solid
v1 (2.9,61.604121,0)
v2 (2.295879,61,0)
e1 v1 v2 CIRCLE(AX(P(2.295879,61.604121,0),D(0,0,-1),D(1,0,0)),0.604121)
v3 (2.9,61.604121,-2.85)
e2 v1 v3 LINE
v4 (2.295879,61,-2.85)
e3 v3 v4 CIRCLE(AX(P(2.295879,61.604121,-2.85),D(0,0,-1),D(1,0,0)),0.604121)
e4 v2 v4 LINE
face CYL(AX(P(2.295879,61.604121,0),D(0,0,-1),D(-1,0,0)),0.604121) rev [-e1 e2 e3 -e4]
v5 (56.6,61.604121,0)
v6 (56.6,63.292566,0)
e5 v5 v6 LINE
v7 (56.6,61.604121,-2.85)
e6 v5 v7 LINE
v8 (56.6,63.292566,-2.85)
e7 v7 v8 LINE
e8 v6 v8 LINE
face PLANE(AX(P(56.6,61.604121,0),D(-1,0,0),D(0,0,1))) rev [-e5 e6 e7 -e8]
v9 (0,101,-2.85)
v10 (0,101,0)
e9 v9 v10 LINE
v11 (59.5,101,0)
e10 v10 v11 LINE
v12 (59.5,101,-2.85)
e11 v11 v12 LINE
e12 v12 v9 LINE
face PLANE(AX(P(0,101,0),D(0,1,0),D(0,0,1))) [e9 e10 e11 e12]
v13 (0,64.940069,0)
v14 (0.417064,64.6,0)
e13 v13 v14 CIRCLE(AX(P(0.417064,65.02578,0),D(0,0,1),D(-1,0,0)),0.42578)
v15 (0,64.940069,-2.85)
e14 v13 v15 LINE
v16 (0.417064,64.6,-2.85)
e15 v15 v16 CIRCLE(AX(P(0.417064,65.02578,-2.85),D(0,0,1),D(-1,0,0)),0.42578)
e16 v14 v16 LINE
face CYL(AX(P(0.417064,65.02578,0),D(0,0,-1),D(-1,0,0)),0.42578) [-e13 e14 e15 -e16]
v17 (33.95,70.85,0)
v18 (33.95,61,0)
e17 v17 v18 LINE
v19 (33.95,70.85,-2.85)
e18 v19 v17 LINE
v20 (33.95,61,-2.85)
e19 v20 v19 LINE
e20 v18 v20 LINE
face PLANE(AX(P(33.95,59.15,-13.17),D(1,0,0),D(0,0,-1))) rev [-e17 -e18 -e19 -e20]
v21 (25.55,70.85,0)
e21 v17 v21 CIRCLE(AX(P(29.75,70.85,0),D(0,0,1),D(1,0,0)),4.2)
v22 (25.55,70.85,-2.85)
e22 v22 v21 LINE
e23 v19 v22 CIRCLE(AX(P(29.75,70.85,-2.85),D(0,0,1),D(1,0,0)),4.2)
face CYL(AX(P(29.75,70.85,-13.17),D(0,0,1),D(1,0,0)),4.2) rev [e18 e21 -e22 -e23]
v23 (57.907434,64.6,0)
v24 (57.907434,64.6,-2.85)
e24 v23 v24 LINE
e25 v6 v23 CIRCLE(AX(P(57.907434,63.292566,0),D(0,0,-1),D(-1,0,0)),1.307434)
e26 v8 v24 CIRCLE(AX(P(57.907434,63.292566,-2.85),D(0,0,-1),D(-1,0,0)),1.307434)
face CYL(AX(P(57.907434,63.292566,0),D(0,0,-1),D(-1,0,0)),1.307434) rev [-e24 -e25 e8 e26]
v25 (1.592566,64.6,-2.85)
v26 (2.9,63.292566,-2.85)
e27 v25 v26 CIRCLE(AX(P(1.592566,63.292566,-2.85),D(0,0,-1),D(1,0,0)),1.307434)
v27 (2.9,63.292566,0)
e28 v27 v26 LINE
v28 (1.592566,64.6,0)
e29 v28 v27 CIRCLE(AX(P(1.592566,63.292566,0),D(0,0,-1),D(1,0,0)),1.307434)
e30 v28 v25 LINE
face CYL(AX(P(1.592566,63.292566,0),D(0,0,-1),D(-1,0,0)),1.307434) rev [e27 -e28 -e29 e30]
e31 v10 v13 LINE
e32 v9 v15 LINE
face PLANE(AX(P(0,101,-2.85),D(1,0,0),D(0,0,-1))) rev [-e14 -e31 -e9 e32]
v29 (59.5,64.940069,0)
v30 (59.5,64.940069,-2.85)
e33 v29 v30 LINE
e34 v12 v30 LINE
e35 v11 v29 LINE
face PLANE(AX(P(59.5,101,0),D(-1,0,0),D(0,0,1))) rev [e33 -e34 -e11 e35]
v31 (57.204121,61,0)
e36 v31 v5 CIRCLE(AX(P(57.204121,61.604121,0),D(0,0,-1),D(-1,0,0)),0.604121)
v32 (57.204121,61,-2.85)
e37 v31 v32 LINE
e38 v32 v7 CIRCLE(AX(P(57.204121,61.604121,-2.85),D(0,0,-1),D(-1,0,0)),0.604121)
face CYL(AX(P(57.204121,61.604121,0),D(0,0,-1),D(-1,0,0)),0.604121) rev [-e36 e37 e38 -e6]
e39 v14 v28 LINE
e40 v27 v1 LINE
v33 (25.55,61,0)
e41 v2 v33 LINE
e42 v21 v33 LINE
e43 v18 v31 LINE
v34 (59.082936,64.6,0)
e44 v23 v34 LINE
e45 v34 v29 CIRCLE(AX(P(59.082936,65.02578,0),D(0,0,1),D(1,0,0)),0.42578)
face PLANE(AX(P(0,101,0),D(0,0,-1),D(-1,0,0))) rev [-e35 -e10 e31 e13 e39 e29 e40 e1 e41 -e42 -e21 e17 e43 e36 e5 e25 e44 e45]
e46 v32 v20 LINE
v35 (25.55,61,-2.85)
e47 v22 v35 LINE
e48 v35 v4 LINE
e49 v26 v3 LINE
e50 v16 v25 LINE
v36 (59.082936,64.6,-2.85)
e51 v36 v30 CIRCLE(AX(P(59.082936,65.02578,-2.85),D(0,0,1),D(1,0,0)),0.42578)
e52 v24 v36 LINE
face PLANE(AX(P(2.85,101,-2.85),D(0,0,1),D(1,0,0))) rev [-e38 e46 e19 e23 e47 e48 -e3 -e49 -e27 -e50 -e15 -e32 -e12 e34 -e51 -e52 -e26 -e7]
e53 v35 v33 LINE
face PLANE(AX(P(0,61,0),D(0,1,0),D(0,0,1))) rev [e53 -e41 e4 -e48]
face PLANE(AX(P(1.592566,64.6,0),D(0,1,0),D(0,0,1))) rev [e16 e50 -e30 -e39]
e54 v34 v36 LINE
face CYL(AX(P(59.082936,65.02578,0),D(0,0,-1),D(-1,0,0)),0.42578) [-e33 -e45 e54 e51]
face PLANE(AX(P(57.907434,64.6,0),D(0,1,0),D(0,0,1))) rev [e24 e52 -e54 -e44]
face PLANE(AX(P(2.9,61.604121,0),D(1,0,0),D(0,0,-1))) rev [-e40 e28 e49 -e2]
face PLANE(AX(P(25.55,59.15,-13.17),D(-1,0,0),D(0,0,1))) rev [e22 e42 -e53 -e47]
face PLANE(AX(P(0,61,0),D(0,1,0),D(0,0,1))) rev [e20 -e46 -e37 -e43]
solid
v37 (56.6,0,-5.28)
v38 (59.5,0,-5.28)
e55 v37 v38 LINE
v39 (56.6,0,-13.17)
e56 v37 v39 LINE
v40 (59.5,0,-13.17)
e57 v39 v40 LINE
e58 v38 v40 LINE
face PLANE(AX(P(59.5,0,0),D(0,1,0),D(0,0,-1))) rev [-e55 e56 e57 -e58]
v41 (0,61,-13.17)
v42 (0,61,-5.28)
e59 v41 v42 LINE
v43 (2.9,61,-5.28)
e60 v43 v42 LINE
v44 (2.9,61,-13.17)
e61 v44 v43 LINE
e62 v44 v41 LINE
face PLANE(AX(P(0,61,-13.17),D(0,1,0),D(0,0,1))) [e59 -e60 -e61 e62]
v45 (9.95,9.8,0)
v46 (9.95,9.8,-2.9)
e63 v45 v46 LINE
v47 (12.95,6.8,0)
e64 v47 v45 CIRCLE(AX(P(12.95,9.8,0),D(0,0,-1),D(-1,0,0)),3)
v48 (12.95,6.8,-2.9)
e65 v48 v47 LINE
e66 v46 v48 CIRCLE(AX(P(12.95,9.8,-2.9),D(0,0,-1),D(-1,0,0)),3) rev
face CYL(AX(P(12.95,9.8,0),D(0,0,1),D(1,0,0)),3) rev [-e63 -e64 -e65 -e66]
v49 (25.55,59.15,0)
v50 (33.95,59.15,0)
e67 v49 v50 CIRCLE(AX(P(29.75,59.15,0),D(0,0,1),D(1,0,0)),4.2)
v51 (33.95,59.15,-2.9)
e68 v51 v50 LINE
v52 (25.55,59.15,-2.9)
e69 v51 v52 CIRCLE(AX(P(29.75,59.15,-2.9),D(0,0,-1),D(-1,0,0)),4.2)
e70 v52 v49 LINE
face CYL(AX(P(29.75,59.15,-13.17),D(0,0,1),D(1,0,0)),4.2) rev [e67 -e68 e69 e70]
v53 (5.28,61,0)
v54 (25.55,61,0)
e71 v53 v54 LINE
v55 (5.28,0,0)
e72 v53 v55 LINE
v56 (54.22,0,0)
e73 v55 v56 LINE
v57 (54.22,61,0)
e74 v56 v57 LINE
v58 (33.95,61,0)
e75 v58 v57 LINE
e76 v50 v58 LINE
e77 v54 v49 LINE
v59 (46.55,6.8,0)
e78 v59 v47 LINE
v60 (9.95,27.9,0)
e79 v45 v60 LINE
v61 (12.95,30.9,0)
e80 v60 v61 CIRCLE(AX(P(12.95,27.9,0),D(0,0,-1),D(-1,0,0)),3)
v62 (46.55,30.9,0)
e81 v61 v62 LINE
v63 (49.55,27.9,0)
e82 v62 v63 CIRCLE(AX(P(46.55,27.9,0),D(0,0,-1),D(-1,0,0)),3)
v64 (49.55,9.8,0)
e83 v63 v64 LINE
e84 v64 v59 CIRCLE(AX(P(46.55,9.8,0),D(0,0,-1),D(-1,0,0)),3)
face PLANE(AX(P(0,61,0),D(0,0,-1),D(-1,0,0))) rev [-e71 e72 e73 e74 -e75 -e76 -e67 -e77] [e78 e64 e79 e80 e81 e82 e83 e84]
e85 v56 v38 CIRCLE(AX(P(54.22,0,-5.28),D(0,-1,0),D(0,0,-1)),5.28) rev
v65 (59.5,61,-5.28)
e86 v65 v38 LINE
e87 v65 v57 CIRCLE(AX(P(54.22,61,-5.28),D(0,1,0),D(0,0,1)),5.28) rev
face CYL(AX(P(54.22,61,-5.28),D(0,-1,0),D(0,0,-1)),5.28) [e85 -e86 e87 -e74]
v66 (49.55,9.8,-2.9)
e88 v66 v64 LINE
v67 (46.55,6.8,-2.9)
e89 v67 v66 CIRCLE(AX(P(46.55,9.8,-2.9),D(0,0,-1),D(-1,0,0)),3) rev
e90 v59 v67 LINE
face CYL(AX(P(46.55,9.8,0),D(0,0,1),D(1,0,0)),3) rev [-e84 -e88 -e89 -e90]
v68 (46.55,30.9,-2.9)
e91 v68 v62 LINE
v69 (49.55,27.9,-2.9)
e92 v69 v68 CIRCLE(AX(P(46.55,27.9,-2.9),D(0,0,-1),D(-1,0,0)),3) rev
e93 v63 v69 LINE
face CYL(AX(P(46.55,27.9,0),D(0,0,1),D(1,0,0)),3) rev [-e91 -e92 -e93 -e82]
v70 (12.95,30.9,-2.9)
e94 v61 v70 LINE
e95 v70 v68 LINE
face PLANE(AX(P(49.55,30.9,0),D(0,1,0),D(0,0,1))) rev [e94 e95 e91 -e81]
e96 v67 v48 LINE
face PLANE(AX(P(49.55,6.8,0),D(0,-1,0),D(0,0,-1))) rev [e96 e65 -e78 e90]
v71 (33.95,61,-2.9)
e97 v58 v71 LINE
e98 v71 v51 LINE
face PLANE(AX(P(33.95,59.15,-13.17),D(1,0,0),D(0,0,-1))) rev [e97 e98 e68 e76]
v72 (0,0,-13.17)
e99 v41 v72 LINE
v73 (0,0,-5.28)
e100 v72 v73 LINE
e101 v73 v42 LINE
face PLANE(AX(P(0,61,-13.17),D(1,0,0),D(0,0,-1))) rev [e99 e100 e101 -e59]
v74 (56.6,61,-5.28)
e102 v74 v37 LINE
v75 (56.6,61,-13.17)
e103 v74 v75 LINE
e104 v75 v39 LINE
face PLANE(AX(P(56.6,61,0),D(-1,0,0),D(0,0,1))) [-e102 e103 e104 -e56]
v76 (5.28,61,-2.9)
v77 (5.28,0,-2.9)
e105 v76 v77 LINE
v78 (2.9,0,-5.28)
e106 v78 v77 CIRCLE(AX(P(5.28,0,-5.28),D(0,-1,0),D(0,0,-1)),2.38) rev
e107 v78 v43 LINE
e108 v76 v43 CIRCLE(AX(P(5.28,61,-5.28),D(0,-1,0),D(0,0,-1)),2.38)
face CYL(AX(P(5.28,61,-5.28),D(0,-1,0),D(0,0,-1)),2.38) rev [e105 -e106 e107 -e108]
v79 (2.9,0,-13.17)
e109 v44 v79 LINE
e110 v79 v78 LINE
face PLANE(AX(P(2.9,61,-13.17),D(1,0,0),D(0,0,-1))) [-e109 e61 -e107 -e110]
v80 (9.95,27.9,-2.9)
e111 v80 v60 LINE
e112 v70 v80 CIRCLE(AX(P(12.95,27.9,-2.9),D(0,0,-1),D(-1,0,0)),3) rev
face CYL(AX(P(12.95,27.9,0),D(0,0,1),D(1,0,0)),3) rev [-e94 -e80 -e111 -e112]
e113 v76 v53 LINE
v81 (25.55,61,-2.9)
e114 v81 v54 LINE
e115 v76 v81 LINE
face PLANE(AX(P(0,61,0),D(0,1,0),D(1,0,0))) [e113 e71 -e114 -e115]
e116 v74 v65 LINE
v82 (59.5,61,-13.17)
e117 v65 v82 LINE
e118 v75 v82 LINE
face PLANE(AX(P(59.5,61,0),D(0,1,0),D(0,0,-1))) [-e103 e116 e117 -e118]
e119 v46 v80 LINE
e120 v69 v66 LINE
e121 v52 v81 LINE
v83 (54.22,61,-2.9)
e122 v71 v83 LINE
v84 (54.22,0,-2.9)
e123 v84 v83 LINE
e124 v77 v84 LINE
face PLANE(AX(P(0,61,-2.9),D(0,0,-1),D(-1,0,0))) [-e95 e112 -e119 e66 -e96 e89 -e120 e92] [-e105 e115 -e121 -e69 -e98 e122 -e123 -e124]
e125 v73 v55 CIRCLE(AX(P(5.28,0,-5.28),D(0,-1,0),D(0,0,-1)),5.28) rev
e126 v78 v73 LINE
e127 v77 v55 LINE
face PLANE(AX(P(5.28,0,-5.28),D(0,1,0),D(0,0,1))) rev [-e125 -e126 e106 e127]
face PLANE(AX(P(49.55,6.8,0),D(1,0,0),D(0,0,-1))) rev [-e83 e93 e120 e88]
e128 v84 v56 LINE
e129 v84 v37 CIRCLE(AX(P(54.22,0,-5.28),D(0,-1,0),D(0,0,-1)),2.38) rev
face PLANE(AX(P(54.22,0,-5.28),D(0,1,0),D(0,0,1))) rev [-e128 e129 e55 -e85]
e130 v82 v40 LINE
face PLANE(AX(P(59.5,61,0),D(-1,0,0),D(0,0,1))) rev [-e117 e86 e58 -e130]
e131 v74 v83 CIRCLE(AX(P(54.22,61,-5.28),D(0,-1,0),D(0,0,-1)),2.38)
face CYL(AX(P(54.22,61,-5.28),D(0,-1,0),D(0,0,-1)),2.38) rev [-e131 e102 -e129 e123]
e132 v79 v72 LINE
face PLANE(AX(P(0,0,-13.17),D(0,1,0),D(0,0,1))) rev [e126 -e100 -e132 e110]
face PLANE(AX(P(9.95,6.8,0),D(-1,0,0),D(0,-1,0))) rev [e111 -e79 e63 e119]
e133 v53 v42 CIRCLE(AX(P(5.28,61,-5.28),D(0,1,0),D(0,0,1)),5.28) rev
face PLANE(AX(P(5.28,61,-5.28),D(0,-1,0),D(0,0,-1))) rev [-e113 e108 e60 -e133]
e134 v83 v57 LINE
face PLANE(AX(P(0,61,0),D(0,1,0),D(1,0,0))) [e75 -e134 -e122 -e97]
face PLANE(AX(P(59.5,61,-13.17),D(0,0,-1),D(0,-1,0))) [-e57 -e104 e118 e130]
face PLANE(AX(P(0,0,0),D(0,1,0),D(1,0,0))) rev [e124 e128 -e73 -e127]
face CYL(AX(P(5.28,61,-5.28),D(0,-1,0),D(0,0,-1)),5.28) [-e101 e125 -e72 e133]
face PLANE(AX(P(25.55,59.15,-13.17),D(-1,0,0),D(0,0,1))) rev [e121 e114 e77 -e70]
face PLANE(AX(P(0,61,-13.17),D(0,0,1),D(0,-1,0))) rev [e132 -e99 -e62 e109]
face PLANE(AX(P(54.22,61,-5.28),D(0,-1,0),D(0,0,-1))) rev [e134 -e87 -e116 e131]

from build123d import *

# Parameters (mm, degrees)
BOSS_EXTRUDE1_DEPTH    = 61
BOSS_EXTRUDE2_DEPTH    = 40
CONVERT_SOLID2_DEPTH   = 61
CONVERT_SOLID2_2_DEPTH = 61
CUT_EXTRUDE3_DEPTH     = 118.676473435
SKETCH16_W             = 39.6
SKETCH16_H             = 24.1
CUT_EXTRUDE4_DEPTH     = 118.672099072
FILLET1_R              = 3
CUT_EXTRUDE5_DEPTH     = 118.960581976


# Read off the part's stored shape, not the designer's step: Convert-Solid2
with BuildPart() as part:
    # Sketch1 → Boss-Extrude1 (new body)
    with BuildSketch(Plane(origin=(0, 0, 0), x_dir=(1, 0, 0), z_dir=(0, 1, 0))):
        Polygon((0, 13.17), (0, 0), (59.5, 0), (59.5, 13.17), (56.65, 13.17), (56.65, 2.85), (2.85, 2.85), (2.85, 13.17), align=None)
    extrude(amount=BOSS_EXTRUDE1_DEPTH)

    # Convert-Solid2 outline → Convert-Solid2 (cut)
    with BuildSketch(Plane(origin=(0, 0, 0), x_dir=(1, 0, 0), z_dir=(0, 1, 0))):
        with BuildLine():
            Line((0, 0), (5.280000066, 0))
            ThreePointArc((5.280000066, 0), (1.546476215, 1.546476215), (0, 5.280000066))
            Line((0, 5.280000066), (0, 0))
        make_face()
        with BuildLine():
            Line((54.219999934, 0), (59.5, 0))
            Line((59.5, 0), (59.5, 5.280000066))
            ThreePointArc((59.5, 5.280000066), (57.953523785, 1.546476215), (54.219999934, 0))
        make_face()
    extrude(amount=CONVERT_SOLID2_DEPTH, mode=Mode.SUBTRACT)

    # Convert-Solid2 2 outline → Convert-Solid2 2 (add)
    with BuildSketch(Plane(origin=(0, 0, 0), x_dir=(1, 0, 0), z_dir=(0, 1, 0))):
        with BuildLine():
            Line((2.85, 13.17), (2.85, 2.85))
            Line((2.85, 2.85), (56.65, 2.85))
            Line((56.65, 2.85), (56.65, 13.17))
            Line((56.65, 13.17), (56.6, 13.17))
            Line((56.6, 13.17), (56.6, 5.280000066))
            ThreePointArc((56.6, 5.280000066), (55.90291412, 3.59708588), (54.219999934, 2.9))
            Line((54.219999934, 2.9), (5.280000066, 2.9))
            ThreePointArc((5.280000066, 2.9), (3.59708588, 3.59708588), (2.9, 5.280000066))
            Line((2.9, 5.280000066), (2.9, 13.17))
            Line((2.9, 13.17), (2.85, 13.17))
        make_face()
    extrude(amount=CONVERT_SOLID2_2_DEPTH)

    # Sketch16 → Cut-Extrude4 (cut, through all)
    with BuildSketch(Plane(origin=(0, 0, -2.9), x_dir=(-1, 0, 0), z_dir=(0, 0, -1))):
        with Locations((-29.75, 18.85)):
            Rectangle(SKETCH16_W, SKETCH16_H)
    extrude(amount=-CUT_EXTRUDE4_DEPTH, mode=Mode.SUBTRACT)

    # Fillet1
    fillet1_edges = [part.edges().sort_by_distance(p)[0] for p in [
        (9.95, 30.9, -1.45),
        (9.95, 6.8, -1.45),
        (49.55, 6.8, -1.45),
        (49.55, 30.9, -1.45),
    ]]
    fillet(fillet1_edges, radius=FILLET1_R)


with BuildPart() as body_2:
    # Sketch9 → Boss-Extrude2 (new body)
    with BuildSketch(Plane(origin=(0, 61, 0), x_dir=(1, 0, 0), z_dir=(0, 1, 0))):
        Polygon((2.85, 2.85), (0, 2.85), (0, 0), (59.5, 0), (59.5, 2.85), align=None)
    extrude(amount=BOSS_EXTRUDE2_DEPTH)

    # Sketch14 → Cut-Extrude3 (cut, through all)
    with BuildSketch(Plane(origin=(0, 0, -2.85), x_dir=(-1, 0, 0), z_dir=(0, 0, -1))):
        with BuildLine():
            Line((-59.5, 61), (-57.204121235, 61))
            ThreePointArc((-57.204121235, 61), (-56.776943013, 61.176943013), (-56.6, 61.604121235))
            Line((-56.6, 61.604121235), (-56.6, 63.292565633))
            ThreePointArc((-56.6, 63.292565633), (-56.98293866, 64.21706134), (-57.907434367, 64.6))
            Line((-57.907434367, 64.6), (-59.082936249, 64.6))
            ThreePointArc((-59.082936249, 64.6), (-59.352003791, 64.695793289), (-59.5, 64.940069401))
            Line((-59.5, 64.940069401), (-59.938547492, 64.940069401))
            Line((-59.938547492, 64.940069401), (-59.938547492, 64.6))
            Line((-59.938547492, 64.6), (-59.938547492, 61))
            Line((-59.938547492, 61), (-59.5, 61))
        make_face()
        with BuildLine():
            Line((0, 64.940069401), (0.438547492, 64.940069401))
            Line((0.438547492, 64.940069401), (0.438547492, 64.6))
            Line((0.438547492, 64.6), (0.438547492, 61))
            Line((0.438547492, 61), (0, 61))
            Line((0, 61), (-2.295878765, 61))
            ThreePointArc((-2.295878765, 61), (-2.723056987, 61.176943013), (-2.9, 61.604121235))
            Line((-2.9, 61.604121235), (-2.9, 63.292565633))
            ThreePointArc((-2.9, 63.292565633), (-2.51706134, 64.21706134), (-1.592565633, 64.6))
            Line((-1.592565633, 64.6), (-0.417063751, 64.6))
            ThreePointArc((-0.417063751, 64.6), (-0.147996209, 64.695793289), (0, 64.940069401))
        make_face()
    extrude(amount=-CUT_EXTRUDE3_DEPTH, mode=Mode.SUBTRACT)


with BuildPart() as cut_extrude5_tool:
    # Sketch17 → Cut-Extrude5 (new, through all)
    with BuildSketch(Plane.XY):
        with BuildLine():
            Line((25.55, 59.15), (25.55, 70.85))
            ThreePointArc((25.55, 70.85), (29.75, 75.05), (33.95, 70.85))
            Line((33.95, 70.85), (33.95, 59.15))
            ThreePointArc((33.95, 59.15), (29.75, 54.95), (25.55, 59.15))
        make_face()
    extrude(amount=-CUT_EXTRUDE5_DEPTH)


with BuildPart() as part_1:
    add(part.part)

    # Cut-Extrude5: cut by cut_extrude5_tool
    add(cut_extrude5_tool.part, mode=Mode.SUBTRACT)


with BuildPart() as body_2_1:
    add(body_2.part)

    # Cut-Extrude5: cut by cut_extrude5_tool
    add(cut_extrude5_tool.part, mode=Mode.SUBTRACT)


solid = Compound([part_1.part, body_2_1.part])
